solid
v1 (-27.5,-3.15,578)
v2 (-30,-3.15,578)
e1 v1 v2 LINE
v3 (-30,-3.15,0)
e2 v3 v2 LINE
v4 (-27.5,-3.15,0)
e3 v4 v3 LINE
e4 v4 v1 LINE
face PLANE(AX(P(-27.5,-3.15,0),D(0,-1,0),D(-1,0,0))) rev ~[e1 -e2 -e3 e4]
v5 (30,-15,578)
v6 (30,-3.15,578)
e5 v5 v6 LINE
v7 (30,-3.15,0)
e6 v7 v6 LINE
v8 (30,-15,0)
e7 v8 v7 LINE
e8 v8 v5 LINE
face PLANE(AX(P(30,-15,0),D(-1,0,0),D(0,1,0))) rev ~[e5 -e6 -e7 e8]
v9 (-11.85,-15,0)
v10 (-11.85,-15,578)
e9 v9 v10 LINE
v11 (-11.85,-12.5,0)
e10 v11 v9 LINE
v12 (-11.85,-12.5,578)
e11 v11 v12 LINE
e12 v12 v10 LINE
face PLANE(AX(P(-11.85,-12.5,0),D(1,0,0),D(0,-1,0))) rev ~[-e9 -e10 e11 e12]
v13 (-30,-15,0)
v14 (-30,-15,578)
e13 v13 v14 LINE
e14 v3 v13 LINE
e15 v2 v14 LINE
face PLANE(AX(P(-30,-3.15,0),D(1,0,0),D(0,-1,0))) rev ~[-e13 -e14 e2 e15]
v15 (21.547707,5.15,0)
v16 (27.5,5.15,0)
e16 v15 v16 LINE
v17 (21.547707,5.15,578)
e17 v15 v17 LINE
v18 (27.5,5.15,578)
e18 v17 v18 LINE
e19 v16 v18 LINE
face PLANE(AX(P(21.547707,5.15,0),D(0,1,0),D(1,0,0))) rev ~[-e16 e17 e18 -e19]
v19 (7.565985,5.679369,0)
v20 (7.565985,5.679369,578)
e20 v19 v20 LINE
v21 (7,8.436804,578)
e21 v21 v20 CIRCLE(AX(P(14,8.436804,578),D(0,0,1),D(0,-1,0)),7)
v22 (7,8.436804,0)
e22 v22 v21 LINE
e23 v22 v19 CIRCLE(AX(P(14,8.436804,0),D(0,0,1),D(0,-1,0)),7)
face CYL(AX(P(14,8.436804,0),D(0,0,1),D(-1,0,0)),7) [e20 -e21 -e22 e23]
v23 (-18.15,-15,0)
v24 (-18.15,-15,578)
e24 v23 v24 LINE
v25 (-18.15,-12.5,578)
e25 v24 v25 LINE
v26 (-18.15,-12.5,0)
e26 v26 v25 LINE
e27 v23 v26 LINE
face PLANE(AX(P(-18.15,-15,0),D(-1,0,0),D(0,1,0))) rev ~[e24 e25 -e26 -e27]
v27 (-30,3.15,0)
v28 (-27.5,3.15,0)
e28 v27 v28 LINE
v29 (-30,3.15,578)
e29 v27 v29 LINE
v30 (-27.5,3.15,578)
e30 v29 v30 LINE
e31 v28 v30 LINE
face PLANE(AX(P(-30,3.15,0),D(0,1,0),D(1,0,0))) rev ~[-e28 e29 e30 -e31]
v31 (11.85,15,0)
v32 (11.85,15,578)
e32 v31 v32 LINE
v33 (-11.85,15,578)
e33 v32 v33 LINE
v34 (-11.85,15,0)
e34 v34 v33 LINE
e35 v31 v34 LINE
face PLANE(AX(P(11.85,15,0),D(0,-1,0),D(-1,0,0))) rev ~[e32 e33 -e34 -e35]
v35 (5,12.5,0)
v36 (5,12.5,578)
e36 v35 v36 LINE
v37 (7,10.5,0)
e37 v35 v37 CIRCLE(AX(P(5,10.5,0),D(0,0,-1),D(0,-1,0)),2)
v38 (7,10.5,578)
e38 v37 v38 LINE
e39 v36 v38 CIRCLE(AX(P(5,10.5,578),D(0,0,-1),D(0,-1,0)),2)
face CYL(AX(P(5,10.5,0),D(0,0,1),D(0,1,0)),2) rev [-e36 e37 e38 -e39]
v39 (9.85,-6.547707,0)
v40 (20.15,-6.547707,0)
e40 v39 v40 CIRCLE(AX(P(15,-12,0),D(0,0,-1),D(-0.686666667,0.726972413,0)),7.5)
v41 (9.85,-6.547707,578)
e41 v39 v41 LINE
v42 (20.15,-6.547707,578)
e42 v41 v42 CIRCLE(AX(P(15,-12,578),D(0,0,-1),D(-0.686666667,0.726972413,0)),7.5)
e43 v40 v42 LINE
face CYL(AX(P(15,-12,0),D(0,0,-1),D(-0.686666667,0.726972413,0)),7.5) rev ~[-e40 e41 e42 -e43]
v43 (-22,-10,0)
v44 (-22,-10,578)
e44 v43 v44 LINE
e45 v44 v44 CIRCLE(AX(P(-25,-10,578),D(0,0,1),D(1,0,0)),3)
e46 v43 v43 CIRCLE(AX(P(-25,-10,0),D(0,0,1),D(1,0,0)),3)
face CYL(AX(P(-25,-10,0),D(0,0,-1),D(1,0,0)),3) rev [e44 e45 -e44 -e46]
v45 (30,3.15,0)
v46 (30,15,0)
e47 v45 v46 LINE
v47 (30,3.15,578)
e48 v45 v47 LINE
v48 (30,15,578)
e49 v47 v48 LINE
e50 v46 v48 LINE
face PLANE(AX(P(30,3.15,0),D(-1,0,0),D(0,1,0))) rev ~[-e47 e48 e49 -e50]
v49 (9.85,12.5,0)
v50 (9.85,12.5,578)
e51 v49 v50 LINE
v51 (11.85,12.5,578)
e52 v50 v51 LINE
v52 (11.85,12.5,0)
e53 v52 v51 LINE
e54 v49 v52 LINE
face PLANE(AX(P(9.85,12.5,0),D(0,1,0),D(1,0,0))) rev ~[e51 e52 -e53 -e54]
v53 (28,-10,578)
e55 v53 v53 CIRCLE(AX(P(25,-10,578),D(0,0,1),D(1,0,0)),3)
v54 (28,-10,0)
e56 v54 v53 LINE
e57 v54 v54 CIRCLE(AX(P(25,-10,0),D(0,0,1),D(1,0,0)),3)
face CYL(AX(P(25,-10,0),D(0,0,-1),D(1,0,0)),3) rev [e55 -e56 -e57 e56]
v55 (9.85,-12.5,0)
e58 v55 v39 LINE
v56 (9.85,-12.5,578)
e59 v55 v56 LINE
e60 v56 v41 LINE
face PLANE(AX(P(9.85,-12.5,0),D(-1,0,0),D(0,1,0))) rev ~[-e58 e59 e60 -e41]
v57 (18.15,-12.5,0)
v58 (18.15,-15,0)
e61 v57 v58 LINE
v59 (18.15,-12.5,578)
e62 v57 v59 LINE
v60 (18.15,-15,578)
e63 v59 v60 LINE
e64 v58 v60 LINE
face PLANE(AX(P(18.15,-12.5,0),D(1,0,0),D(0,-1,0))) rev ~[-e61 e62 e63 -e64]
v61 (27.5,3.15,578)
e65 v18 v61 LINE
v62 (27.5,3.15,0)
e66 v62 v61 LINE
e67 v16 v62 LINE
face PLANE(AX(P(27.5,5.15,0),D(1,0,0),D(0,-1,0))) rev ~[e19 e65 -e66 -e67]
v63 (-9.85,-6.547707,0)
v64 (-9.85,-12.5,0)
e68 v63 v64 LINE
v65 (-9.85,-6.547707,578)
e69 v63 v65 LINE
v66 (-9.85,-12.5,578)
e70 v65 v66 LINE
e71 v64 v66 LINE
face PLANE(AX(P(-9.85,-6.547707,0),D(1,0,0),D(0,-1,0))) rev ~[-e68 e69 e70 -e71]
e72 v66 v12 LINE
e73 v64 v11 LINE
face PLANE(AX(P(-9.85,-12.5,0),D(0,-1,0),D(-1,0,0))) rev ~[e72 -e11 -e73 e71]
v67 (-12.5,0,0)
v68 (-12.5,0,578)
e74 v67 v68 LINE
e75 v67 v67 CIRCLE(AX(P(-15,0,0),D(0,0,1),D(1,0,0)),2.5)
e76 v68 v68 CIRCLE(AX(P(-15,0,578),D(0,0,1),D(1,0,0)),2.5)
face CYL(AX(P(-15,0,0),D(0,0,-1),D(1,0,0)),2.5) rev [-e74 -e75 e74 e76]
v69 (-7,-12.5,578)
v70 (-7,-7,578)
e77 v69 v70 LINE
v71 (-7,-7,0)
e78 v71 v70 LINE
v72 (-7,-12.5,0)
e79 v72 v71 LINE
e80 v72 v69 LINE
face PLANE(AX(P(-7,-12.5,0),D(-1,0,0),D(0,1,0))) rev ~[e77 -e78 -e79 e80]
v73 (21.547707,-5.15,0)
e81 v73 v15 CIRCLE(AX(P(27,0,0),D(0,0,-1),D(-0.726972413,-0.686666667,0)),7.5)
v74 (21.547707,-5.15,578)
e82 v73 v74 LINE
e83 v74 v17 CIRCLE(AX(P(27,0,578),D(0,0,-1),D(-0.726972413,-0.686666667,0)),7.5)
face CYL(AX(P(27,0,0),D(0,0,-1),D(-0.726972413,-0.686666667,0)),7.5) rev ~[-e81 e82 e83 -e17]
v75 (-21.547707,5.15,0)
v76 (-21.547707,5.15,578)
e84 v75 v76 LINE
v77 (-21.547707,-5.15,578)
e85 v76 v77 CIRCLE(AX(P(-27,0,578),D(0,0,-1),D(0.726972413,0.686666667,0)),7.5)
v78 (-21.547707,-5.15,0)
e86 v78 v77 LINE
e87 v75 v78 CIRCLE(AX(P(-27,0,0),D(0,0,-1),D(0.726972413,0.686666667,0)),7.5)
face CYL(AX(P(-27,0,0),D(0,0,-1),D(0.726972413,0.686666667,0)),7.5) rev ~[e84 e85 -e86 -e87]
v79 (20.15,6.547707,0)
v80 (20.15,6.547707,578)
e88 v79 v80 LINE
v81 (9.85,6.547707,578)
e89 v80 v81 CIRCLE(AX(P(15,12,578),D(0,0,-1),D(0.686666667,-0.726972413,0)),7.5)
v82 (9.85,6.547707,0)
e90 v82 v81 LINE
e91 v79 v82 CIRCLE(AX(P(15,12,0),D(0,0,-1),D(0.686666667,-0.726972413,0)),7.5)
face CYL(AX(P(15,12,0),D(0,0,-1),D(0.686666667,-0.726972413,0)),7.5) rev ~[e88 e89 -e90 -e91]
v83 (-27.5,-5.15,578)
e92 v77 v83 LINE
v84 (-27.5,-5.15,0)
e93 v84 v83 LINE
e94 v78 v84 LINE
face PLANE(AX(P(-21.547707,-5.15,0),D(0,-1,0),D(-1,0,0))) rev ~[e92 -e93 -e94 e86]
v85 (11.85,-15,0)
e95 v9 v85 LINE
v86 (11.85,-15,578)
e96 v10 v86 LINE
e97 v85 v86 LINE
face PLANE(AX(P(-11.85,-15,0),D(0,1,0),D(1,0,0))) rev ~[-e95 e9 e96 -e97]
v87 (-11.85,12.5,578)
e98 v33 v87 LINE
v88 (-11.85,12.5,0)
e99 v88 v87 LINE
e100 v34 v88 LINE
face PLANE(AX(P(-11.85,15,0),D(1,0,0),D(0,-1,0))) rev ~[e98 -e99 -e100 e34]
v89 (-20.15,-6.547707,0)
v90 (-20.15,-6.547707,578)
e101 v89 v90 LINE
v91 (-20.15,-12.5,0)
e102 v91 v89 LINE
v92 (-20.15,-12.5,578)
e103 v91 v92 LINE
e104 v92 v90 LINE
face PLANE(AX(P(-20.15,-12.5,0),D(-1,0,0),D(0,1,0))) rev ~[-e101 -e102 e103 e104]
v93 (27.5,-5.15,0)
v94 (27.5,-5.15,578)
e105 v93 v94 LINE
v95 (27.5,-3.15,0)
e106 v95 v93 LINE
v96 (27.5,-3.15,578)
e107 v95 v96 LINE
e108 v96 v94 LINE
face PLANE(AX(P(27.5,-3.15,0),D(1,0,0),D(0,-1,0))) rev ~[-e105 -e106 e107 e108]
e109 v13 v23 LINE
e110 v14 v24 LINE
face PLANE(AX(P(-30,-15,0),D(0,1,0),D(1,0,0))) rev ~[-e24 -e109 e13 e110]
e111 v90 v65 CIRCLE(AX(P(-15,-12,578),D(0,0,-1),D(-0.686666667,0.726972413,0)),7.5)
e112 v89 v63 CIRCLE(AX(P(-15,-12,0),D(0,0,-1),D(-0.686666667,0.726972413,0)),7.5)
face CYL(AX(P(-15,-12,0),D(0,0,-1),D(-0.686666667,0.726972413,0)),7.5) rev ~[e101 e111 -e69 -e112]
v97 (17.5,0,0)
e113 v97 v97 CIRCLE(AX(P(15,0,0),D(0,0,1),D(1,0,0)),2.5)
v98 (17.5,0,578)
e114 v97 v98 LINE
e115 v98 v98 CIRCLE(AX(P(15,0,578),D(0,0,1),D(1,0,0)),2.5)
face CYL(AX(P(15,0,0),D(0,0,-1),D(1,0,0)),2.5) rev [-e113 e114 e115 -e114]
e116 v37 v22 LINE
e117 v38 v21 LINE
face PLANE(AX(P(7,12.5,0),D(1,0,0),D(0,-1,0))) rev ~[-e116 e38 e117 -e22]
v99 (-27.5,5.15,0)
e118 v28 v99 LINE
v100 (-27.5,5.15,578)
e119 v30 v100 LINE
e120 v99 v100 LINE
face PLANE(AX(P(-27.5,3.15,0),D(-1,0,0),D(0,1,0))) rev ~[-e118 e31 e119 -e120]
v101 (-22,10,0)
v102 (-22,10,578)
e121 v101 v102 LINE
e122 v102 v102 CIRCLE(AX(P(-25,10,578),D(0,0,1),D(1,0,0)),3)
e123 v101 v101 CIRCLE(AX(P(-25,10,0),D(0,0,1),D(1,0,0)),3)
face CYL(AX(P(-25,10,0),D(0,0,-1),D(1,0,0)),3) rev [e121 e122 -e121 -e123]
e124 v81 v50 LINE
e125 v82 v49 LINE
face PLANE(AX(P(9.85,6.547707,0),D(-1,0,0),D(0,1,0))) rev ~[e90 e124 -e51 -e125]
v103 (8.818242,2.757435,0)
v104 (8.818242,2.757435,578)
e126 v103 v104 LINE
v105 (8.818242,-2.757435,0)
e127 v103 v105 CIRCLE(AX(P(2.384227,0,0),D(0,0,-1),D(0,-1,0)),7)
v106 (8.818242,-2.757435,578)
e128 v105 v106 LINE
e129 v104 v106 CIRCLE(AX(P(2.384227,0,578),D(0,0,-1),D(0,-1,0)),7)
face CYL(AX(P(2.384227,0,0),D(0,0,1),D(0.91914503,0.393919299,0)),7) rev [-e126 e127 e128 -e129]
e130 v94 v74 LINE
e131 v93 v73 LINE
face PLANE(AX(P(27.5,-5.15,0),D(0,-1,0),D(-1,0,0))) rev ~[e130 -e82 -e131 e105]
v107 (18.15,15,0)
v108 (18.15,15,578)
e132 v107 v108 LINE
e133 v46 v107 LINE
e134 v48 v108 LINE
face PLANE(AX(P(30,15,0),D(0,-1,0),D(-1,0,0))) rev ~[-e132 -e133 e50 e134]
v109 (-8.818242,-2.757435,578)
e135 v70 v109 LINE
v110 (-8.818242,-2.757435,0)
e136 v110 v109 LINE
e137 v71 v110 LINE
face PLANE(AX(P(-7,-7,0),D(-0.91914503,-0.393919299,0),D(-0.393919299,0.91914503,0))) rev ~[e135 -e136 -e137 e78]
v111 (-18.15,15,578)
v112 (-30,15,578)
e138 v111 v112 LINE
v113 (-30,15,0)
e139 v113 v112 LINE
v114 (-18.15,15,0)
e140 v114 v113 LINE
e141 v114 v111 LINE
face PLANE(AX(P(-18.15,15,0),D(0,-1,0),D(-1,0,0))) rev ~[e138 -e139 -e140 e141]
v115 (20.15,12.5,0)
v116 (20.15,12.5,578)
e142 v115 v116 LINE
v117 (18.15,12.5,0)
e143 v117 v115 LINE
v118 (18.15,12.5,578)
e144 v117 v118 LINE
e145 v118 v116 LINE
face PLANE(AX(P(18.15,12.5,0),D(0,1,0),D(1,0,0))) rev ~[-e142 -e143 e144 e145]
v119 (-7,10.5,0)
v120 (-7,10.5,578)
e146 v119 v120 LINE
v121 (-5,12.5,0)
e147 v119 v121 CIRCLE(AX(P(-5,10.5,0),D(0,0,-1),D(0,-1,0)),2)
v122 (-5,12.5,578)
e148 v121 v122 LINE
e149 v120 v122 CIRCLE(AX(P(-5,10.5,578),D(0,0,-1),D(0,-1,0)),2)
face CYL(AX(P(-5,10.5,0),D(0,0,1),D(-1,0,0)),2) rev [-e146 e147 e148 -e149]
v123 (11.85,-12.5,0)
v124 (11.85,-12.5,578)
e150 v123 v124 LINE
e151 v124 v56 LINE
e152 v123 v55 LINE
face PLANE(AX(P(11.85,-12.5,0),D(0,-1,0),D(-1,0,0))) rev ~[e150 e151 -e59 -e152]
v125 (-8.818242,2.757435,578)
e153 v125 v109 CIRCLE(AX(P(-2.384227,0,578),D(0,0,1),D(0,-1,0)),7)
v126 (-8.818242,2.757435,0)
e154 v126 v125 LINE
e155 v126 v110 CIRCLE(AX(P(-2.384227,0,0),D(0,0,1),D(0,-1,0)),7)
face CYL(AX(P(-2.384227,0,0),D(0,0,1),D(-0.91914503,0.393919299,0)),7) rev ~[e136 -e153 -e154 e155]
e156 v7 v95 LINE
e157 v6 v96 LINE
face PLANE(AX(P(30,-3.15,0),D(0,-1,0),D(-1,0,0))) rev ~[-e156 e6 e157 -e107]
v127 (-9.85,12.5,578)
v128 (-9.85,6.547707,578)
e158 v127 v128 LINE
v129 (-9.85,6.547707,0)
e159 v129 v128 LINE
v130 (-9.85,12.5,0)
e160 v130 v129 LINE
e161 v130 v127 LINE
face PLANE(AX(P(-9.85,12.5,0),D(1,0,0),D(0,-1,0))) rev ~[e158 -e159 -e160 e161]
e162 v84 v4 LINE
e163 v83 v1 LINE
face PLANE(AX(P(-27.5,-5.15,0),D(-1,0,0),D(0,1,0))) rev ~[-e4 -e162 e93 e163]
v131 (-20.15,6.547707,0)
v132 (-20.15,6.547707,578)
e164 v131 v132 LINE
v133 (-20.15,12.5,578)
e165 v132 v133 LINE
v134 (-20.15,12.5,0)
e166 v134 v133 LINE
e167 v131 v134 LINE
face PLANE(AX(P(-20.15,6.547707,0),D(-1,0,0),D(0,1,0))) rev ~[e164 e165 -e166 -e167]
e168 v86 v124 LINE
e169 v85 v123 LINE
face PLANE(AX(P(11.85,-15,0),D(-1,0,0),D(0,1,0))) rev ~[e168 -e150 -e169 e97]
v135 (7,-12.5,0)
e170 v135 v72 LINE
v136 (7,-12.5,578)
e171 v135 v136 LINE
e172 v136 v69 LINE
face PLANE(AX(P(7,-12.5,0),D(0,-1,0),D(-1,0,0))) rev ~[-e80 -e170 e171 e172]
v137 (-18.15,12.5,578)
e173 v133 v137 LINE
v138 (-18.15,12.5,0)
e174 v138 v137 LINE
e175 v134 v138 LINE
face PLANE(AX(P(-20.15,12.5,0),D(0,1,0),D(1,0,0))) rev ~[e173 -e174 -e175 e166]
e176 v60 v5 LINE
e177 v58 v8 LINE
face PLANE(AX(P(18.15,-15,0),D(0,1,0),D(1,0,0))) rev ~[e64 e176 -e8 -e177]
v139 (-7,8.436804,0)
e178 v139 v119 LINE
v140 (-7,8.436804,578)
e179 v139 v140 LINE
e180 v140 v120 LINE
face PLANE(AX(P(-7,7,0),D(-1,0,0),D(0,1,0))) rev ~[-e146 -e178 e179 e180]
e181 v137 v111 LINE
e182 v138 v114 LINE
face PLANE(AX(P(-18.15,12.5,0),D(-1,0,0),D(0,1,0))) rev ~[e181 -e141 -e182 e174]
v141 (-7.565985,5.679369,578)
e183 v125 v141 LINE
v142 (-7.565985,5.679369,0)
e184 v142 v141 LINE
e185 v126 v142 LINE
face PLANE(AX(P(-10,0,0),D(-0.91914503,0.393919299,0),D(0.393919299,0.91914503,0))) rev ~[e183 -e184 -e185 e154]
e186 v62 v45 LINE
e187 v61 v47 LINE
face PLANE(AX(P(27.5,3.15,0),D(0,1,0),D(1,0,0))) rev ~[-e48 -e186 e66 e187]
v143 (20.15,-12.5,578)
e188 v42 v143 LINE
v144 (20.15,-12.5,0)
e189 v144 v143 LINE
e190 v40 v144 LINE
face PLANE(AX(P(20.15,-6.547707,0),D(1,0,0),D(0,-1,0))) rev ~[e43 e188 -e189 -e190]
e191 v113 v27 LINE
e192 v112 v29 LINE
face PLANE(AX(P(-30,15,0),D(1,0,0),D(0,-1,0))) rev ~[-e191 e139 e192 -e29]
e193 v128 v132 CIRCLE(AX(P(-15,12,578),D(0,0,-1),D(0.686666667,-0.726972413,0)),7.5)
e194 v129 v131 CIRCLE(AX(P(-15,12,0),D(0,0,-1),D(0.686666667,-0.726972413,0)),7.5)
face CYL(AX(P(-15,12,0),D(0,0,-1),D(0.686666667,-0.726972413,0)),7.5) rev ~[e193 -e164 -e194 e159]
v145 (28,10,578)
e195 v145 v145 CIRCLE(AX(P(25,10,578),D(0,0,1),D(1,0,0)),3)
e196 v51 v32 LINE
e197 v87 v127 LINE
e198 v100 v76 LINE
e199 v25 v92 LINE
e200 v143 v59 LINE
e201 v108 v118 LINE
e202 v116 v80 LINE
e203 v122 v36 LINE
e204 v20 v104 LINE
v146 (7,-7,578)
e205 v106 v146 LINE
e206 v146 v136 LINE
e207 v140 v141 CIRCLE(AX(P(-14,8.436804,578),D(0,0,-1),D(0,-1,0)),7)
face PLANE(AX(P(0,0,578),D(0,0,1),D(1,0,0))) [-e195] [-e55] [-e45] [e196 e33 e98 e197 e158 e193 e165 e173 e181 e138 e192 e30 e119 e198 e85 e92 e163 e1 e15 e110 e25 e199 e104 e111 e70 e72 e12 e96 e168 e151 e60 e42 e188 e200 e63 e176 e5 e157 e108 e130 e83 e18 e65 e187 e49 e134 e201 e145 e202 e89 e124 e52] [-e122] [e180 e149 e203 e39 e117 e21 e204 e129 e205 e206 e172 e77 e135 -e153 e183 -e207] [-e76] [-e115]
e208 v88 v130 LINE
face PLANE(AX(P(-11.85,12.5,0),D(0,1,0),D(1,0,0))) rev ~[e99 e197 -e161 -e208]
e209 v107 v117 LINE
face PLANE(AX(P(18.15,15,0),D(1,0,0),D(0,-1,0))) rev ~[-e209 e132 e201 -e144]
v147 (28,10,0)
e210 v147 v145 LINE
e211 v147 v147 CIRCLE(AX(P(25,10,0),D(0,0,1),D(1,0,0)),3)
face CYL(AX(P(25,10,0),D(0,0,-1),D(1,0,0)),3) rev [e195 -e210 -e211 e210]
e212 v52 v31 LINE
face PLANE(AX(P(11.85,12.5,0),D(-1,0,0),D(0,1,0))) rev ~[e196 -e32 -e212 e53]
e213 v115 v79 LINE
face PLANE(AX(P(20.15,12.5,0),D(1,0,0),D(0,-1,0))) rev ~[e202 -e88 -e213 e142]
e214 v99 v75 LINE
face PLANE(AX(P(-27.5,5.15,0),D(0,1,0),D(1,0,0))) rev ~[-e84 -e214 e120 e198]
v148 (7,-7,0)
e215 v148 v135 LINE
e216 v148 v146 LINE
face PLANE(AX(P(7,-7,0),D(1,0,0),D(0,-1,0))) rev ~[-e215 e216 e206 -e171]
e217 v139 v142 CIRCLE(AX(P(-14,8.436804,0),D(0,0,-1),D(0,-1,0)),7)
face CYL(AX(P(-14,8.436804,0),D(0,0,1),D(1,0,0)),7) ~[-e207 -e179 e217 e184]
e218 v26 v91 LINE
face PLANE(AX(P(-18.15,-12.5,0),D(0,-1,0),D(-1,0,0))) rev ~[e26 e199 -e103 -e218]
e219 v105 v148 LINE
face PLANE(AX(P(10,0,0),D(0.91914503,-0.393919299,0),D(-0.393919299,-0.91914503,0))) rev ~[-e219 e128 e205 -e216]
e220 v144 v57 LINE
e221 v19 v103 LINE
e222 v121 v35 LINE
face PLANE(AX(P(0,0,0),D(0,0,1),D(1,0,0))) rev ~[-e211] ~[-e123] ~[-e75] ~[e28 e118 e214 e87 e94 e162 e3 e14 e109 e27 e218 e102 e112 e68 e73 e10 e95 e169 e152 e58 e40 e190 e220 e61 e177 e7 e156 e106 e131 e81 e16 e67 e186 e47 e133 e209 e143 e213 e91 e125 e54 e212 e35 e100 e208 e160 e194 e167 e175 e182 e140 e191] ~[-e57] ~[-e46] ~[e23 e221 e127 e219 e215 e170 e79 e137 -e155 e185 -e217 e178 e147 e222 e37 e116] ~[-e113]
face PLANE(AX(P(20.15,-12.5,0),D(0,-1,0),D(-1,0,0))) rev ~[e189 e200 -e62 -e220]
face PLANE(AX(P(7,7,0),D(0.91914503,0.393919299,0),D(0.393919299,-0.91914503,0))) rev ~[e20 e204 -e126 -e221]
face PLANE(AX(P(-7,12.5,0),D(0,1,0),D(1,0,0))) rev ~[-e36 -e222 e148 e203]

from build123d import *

# Parameters (mm, degrees)
F0_R     = 3
F0_R_2   = 2.5
F1_DEPTH = 578
F2_R     = 2
F3_R     = 7


# Not quite as in the source:
# - a feature names something its author has since deleted; it is built from what else it names


with BuildPart() as f1:
    # F0 (on Top) → F1 (new body)
    with BuildSketch(Plane.XY):
        with BuildLine():
            Line((18.15, -15), (30, -15))
            Line((30, -15), (30, -3.15))
            Line((30, -3.15), (27.5, -3.15))
            Line((27.5, -3.15), (27.5, -5.15))
            Line((27.5, -5.15), (21.5477069044, -5.15))
            ThreePointArc((21.5477069044, -5.15), (19.5, 0), (21.5477069044, 5.15))
            Line((21.5477069044, 5.15), (27.5, 5.15))
            Line((27.5, 5.15), (27.5, 3.15))
            Line((27.5, 3.15), (30, 3.15))
            Line((30, 3.15), (30, 15))
            Line((30, 15), (18.15, 15))
            Line((18.15, 15), (18.15, 12.5))
            Line((18.15, 12.5), (20.15, 12.5))
            Line((20.15, 12.5), (20.15, 6.5477069044))
            ThreePointArc((20.15, 6.5477069044), (15, 4.5), (9.85, 6.5477069044))
            Line((9.85, 6.5477069044), (9.85, 12.5))
            Line((9.85, 12.5), (11.85, 12.5))
            Line((11.85, 12.5), (11.85, 15))
            Line((11.85, 15), (-11.85, 15))
            Line((-11.85, 15), (-11.85, 12.5))
            Line((-11.85, 12.5), (-9.85, 12.5))
            Line((-9.85, 12.5), (-9.85, 6.5477069044))
            ThreePointArc((-9.85, 6.5477069044), (-15, 4.5), (-20.15, 6.5477069044))
            Line((-20.15, 6.5477069044), (-20.15, 12.5))
            Line((-20.15, 12.5), (-18.15, 12.5))
            Line((-18.15, 12.5), (-18.15, 15))
            Line((-18.15, 15), (-30, 15))
            Line((-30, 15), (-30, 3.15))
            Line((-30, 3.15), (-27.5, 3.15))
            Line((-27.5, 3.15), (-27.5, 5.15))
            Line((-27.5, 5.15), (-21.5477069044, 5.15))
            ThreePointArc((-21.5477069044, 5.15), (-19.5, 0), (-21.5477069044, -5.15))
            Line((-21.5477069044, -5.15), (-27.5, -5.15))
            Line((-27.5, -5.15), (-27.5, -3.15))
            Line((-27.5, -3.15), (-30, -3.15))
            Line((-30, -3.15), (-30, -15))
            Line((-30, -15), (-18.15, -15))
            Line((-18.15, -15), (-18.15, -12.5))
            Line((-18.15, -12.5), (-20.15, -12.5))
            Line((-20.15, -12.5), (-20.15, -6.5477069044))
            ThreePointArc((-20.15, -6.5477069044), (-15, -4.5), (-9.85, -6.5477069044))
            Line((-9.85, -6.5477069044), (-9.85, -12.5))
            Line((-9.85, -12.5), (-11.85, -12.5))
            Line((-11.85, -12.5), (-11.85, -15))
            Line((-11.85, -15), (11.85, -15))
            Line((11.85, -15), (11.85, -12.5))
            Line((11.85, -12.5), (9.85, -12.5))
            Line((9.85, -12.5), (9.85, -6.5477069044))
            ThreePointArc((9.85, -6.5477069044), (15, -4.5), (20.15, -6.5477069044))
            Line((20.15, -6.5477069044), (20.15, -12.5))
            Line((20.15, -12.5), (18.15, -12.5))
            Line((18.15, -12.5), (18.15, -15))
        make_face()
        with Locations((-25, -10)):
            Circle(F0_R, mode=Mode.SUBTRACT)
        with Locations((25, -10)):
            Circle(F0_R, mode=Mode.SUBTRACT)
        with Locations((-15, 0)):
            Circle(F0_R_2, mode=Mode.SUBTRACT)
        with Locations((-25, 10)):
            Circle(F0_R, mode=Mode.SUBTRACT)
        Polygon((-7, 7), (-7, 12.5), (0, 12.5), (7, 12.5), (7, 7), (10, 0), (7, -7), (7, -12.5), (0, -12.5), (-7, -12.5), (-7, -7), (-10, 0), align=None, mode=Mode.SUBTRACT)
        with Locations((15, 0)):
            Circle(F0_R_2, mode=Mode.SUBTRACT)
        with Locations((25, 10)):
            Circle(F0_R, mode=Mode.SUBTRACT)
    extrude(amount=F1_DEPTH)

    # F2
    f2_edges = [f1.edges().sort_by_distance(p)[0] for p in [
        (-7, 12.5, 289),
        (7, 12.5, 289),
    ]]
    fillet(f2_edges, radius=F2_R)

    # F3
    f3_edges = [f1.edges().sort_by_distance(p)[0] for p in [
        (-7, 7, 289),
        (-10, 0, 289),
        (7, 7, 289),
        (10, 0, 289),
    ]]
    fillet(f3_edges, radius=F3_R)


solid = f1.part
